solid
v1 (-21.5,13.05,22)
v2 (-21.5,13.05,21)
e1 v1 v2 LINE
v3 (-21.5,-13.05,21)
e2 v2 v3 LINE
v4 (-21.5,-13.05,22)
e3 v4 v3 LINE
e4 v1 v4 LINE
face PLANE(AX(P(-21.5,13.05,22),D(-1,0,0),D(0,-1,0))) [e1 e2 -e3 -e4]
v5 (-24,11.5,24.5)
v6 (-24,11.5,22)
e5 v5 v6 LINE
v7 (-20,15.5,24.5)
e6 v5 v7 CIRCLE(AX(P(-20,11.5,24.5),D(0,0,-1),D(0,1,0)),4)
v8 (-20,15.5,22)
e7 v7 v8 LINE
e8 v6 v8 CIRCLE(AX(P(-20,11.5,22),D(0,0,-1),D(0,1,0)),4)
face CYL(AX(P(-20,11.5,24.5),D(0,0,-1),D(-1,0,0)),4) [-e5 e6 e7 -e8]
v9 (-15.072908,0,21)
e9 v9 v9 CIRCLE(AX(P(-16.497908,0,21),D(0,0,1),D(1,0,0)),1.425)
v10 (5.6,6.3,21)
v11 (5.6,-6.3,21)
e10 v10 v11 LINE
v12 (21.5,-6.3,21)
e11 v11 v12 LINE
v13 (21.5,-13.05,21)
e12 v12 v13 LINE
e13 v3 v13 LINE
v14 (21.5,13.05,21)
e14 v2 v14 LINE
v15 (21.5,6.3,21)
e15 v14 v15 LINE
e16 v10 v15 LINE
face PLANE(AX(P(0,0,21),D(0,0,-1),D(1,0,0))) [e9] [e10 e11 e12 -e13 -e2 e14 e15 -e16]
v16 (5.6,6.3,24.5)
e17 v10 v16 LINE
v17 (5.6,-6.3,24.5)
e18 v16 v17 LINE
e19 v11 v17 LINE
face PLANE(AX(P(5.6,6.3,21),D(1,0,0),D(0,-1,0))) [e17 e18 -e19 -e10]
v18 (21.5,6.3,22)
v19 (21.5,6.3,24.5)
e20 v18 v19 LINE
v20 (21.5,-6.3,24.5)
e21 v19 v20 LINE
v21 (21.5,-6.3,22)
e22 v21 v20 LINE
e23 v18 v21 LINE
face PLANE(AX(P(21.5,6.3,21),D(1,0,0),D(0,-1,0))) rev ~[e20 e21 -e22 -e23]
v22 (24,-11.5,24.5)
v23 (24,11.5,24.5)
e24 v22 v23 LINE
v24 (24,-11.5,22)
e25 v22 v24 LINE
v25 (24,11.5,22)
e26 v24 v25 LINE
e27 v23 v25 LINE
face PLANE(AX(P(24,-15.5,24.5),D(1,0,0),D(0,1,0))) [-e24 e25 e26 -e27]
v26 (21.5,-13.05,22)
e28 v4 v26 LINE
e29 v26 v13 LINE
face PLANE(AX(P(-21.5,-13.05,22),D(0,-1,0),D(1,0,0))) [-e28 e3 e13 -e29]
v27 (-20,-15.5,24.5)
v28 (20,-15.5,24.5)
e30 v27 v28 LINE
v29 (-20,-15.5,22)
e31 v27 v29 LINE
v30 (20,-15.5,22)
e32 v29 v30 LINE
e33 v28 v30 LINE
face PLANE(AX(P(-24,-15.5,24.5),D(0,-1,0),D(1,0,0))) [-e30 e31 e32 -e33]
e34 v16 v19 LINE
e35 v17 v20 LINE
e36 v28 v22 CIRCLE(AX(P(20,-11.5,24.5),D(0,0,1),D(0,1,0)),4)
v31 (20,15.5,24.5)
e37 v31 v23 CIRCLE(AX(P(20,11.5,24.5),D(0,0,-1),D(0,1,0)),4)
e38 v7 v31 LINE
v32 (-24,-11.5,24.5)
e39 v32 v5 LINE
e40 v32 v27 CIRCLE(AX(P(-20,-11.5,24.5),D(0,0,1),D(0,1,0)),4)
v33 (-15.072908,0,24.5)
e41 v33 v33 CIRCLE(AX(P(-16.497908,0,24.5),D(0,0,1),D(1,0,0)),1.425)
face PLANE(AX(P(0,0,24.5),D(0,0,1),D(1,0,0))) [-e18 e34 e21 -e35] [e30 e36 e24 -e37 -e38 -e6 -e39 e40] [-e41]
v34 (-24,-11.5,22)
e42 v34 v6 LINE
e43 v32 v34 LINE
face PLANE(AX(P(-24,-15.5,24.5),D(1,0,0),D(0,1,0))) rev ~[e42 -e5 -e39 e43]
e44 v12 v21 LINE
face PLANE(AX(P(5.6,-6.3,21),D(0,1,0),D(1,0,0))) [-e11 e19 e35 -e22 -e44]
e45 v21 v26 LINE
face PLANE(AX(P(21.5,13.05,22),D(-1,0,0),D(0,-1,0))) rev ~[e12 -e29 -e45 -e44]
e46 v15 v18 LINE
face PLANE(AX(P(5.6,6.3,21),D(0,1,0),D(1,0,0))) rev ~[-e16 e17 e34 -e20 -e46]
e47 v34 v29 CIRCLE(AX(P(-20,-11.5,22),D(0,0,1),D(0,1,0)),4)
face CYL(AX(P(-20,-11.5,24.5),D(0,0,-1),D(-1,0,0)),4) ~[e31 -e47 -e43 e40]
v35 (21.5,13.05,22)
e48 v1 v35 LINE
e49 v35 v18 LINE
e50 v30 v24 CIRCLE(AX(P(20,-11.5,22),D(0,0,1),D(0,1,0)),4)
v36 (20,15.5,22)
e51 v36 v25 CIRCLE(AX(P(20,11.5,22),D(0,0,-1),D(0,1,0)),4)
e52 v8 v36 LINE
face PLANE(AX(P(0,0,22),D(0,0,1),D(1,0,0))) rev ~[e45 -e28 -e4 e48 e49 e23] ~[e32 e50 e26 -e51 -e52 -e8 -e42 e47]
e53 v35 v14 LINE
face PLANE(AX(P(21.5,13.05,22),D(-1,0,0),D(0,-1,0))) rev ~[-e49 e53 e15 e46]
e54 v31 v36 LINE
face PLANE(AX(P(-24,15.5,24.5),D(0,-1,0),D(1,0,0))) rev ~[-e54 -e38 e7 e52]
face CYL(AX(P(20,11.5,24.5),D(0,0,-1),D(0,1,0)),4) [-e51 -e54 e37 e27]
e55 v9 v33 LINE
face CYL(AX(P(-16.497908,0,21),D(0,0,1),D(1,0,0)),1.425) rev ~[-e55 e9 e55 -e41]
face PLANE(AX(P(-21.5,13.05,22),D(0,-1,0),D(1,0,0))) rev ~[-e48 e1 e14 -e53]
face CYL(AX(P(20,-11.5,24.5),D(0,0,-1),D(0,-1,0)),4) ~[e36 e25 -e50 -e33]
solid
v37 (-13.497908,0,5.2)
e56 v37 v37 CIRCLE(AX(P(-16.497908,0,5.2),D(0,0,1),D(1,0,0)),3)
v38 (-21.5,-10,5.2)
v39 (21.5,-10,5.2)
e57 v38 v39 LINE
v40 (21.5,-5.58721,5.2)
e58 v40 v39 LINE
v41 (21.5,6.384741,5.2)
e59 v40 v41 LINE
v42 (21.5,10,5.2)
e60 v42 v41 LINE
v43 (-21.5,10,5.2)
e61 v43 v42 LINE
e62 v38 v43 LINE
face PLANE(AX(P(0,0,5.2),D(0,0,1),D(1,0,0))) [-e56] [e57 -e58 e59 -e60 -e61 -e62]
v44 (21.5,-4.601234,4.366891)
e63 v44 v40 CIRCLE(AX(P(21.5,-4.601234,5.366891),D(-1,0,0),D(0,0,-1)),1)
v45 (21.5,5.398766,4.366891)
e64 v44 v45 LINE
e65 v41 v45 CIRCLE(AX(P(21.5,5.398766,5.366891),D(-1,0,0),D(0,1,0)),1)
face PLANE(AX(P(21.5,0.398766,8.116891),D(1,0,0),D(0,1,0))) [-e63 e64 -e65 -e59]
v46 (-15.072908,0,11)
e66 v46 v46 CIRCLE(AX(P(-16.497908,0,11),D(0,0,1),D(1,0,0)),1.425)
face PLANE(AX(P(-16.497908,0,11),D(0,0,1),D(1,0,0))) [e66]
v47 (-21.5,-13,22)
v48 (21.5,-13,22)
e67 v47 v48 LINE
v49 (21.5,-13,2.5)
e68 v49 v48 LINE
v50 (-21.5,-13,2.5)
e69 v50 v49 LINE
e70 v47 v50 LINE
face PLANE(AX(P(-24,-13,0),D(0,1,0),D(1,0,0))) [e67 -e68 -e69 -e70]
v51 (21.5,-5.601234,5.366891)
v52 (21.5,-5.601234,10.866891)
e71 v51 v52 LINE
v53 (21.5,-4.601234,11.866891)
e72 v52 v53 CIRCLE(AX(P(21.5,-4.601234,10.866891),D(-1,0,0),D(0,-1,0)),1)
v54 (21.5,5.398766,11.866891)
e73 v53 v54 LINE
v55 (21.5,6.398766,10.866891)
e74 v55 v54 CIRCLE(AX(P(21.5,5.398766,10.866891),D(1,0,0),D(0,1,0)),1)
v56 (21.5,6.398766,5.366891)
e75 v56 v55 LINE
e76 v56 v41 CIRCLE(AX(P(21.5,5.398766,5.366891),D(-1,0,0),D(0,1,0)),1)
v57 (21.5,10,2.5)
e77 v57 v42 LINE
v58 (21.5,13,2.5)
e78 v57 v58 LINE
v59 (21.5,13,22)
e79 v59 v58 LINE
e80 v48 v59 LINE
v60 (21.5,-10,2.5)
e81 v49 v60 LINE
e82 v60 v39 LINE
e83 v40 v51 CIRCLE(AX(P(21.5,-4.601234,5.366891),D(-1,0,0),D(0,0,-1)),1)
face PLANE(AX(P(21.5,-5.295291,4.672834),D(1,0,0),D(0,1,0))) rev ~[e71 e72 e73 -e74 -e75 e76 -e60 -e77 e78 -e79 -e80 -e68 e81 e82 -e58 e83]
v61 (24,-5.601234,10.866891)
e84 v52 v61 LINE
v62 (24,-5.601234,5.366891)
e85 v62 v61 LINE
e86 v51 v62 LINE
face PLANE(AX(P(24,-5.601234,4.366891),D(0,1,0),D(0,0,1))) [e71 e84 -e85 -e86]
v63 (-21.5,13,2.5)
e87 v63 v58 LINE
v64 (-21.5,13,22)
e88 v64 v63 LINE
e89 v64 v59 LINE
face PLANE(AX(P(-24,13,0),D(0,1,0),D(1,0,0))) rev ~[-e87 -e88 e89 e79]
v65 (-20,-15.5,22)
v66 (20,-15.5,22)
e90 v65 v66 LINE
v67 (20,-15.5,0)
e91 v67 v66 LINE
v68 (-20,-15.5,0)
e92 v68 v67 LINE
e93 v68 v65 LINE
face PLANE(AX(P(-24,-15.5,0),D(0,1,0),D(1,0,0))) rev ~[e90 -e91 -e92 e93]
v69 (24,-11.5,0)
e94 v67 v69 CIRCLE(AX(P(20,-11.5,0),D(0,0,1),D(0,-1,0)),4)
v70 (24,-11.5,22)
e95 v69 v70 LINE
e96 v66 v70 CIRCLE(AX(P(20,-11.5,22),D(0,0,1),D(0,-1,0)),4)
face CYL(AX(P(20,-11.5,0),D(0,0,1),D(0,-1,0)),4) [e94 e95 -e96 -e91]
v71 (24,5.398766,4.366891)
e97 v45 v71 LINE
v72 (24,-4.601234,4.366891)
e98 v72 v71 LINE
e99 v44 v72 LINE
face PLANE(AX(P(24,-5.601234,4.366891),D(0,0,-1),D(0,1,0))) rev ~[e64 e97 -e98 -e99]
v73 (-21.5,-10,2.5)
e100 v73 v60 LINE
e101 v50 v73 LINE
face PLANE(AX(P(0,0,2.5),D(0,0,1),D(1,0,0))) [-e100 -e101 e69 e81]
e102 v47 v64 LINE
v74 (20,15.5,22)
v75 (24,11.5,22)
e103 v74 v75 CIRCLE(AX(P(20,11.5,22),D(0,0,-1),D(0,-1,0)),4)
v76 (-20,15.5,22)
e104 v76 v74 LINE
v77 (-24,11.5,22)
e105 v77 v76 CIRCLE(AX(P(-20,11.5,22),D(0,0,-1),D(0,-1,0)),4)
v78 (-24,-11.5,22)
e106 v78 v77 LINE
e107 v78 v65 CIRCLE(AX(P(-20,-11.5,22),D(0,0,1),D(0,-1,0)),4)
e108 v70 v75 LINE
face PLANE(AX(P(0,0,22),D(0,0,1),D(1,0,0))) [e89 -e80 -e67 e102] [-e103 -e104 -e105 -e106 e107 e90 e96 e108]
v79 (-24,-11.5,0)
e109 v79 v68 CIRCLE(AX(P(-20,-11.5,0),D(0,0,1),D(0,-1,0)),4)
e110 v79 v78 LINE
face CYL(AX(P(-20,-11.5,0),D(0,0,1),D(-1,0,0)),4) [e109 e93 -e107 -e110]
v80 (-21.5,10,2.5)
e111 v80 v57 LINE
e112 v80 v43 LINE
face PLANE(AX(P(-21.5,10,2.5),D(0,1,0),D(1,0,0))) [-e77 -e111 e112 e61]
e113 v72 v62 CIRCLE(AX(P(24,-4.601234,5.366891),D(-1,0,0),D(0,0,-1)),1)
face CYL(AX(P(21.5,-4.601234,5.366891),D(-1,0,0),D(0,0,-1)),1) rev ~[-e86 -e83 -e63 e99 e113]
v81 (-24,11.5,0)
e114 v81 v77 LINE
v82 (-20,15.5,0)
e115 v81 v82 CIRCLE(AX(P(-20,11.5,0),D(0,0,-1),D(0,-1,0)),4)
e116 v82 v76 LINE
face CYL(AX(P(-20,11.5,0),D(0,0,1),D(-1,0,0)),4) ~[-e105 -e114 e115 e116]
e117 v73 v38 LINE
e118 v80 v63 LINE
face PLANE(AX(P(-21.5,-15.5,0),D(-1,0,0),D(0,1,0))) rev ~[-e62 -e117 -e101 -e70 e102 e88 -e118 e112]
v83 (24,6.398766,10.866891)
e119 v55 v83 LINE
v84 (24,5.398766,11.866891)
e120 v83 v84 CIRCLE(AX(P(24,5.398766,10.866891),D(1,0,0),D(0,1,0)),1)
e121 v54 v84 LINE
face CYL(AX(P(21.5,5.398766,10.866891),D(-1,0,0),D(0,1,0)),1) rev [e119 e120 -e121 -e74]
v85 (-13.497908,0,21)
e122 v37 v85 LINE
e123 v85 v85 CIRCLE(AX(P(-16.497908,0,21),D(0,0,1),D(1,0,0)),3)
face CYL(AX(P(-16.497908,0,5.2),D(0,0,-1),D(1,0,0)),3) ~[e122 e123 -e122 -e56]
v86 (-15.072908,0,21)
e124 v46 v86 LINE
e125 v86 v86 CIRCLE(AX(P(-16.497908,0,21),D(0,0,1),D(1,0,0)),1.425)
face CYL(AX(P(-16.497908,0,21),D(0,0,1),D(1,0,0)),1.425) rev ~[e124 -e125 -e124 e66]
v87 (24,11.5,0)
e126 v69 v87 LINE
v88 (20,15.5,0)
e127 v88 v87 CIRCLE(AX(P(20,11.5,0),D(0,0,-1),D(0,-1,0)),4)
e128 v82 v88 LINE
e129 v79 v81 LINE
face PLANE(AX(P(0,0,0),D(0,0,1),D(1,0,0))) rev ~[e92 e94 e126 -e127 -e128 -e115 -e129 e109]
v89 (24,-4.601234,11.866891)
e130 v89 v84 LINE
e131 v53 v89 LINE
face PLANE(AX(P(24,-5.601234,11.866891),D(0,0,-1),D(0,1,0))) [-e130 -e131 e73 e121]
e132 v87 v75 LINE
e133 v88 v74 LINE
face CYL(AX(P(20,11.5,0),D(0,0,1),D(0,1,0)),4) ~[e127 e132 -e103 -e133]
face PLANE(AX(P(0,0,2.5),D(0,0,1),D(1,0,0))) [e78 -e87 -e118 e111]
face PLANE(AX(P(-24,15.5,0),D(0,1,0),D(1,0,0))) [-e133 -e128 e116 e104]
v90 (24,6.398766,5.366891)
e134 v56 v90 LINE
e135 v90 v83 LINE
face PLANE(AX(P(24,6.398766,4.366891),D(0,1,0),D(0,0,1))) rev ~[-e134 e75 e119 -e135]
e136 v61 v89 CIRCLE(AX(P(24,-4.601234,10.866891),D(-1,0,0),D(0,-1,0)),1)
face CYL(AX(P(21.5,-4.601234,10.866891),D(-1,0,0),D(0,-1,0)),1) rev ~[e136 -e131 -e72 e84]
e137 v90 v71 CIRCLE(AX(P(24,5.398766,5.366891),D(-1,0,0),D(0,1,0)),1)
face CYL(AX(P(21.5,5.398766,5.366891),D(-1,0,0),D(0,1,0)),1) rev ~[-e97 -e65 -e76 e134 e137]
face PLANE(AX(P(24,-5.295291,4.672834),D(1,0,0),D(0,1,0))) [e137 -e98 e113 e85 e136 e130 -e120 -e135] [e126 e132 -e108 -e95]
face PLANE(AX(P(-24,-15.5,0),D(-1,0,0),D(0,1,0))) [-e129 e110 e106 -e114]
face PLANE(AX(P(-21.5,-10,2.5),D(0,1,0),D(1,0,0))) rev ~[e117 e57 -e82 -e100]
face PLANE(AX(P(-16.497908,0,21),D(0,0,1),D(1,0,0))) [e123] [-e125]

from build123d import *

# Parameters (mm, degrees)
F0_W           = 48
F0_H           = 31
F1_DEPTH       = 22
F2_T           = -2.5
F3_W           = 43
F3_H           = 20
F4_DEPTH       = 2.7
F6_W           = 48
F6_H           = 31
F7_DEPTH       = 2.5
F8_W           = 43
F8_H           = 26.1
F9_DEPTH       = 1
F10_W          = 15.9
F10_H          = 12.6
F11_DEPTH      = 3.5
F12_R          = 4
F12_2_R        = 4
F13_W          = 12
F13_H          = 7.5
F14_DEPTH      = 2.5
F15_T1_DEPTH   = 2.5
F16_R          = 3
F17_DEPTH      = 15.8
F18_R          = 1.425
F19_DEPTH      = 3.5
F19_DEPTH_BACK = 10


# Not quite as in the source:
# - a fillet or chamfer that OpenCascade refuses, or shapes differently, is made with other operations: its cross-section is extruded or revolved along the edge and cut away or added


with BuildPart() as f1:
    # F0 (on Top) → F1 (new body)
    with BuildSketch(Plane.XY):
        Rectangle(F0_W, F0_H)
    extrude(amount=F1_DEPTH)

    # F2
    f2_openings = [f1.faces().sort_by_distance(p)[0] for p in [
        (0, 0, 22),
    ]]
    offset(amount=F2_T, openings=f2_openings)

    # F3 (on face) → F4 (join)
    with BuildSketch(Plane.XY.offset(2.5)):
        Rectangle(F3_W, F3_H)
    extrude(amount=F4_DEPTH)

    # F12
    f12_edges = [f1.edges().sort_by_distance(p)[0] for p in [
        (24, -15.5, 11),
        (-24, -15.5, 11),
        (-24, 15.5, 11),
        (24, 15.5, 11),
    ]]
    fillet(f12_edges, radius=F12_R)

    # F13 (on face) → F14 (cut, through all)
    with BuildSketch(Plane.YZ.offset(24)):
        with Locations((0.3987657316, 8.116890993)):
            Rectangle(F13_W, F13_H)
    extrude(amount=-F14_DEPTH, mode=Mode.SUBTRACT)

    # F15: fillet of radius 1 on 4 edges, made by hand

    # F15_s2 → F15_t1 (join)
    with BuildSketch(Plane.YZ.offset(21.5)):
        with BuildLine():
            ThreePointArc((-4.6012342684, 4.366890993), (-5.3083410496, 4.6597842118), (-5.6012342684, 5.366890993))
            Line((-5.6012342684, 5.366890993), (-5.6012342684, 4.366890993))
            Line((-5.6012342684, 4.366890993), (-4.6012342684, 4.366890993))
        make_face()
        with BuildLine():
            ThreePointArc((6.3987657316, 5.366890993), (6.1058725128, 4.6597842118), (5.3987657316, 4.366890993))
            Line((5.3987657316, 4.366890993), (6.3987657316, 4.366890993))
            Line((6.3987657316, 4.366890993), (6.3987657316, 5.366890993))
        make_face()
        with BuildLine():
            ThreePointArc((6.3987657316, 10.866890993), (6.1058725128, 11.5739977742), (5.3987657316, 11.866890993))
            Line((5.3987657316, 11.866890993), (6.3987657316, 11.866890993))
            Line((6.3987657316, 11.866890993), (6.3987657316, 10.866890993))
        make_face()
        with BuildLine():
            ThreePointArc((-5.6012342684, 10.866890993), (-5.3083410496, 11.5739977742), (-4.6012342684, 11.866890993))
            Line((-4.6012342684, 11.866890993), (-5.6012342684, 11.866890993))
            Line((-5.6012342684, 11.866890993), (-5.6012342684, 10.866890993))
        make_face()
    extrude(amount=F15_T1_DEPTH)

    # F16 (on face) → F17 (join, through all)
    with BuildSketch(Plane.XY.offset(5.2)):
        with Locations((-16.4979076515, 0)):
            Circle(F16_R)
    extrude(amount=F17_DEPTH)


with BuildPart() as f7:
    # F6 (on offset) → F7 (new body)
    with BuildSketch(Plane.XY.offset(24.5)):
        Rectangle(F6_W, F6_H)
    extrude(amount=-F7_DEPTH)

    # F8 (on face) → F9 (join)
    with BuildSketch(Plane(origin=(0, 0, 22), x_dir=(1, 0, 0), z_dir=(0, 0, -1))):
        Rectangle(F8_W, F8_H)
    extrude(amount=F9_DEPTH)

    # F10 (on face) → F11 (cut, through all)
    with BuildSketch(Plane(origin=(0, 0, 21), x_dir=(1, 0, 0), z_dir=(0, 0, -1))):
        with Locations((13.55, 0)):
            Rectangle(F10_W, F10_H)
    extrude(amount=-F11_DEPTH, mode=Mode.SUBTRACT)

    # F12#2
    f12_2_edges = [f7.edges().sort_by_distance(p)[0] for p in [
        (24, -15.5, 23.25),
        (24, 15.5, 23.25),
        (-24, -15.5, 23.25),
        (-24, 15.5, 23.25),
    ]]
    fillet(f12_2_edges, radius=F12_2_R)


with BuildPart() as f19_tool:
    # F18 (on face) → F19 (new body, two sides)
    with BuildSketch(Plane.XY.offset(21)) as f19_sk:
        with Locations((-16.4979076515, 0)):
            Circle(F18_R)
    extrude(amount=F19_DEPTH)
    extrude(f19_sk.sketch, amount=-F19_DEPTH_BACK)


with BuildPart() as f1_1:
    add(f1.part)

    # F19: cut by f19_tool
    add(f19_tool.part, mode=Mode.SUBTRACT)


with BuildPart() as f7_1:
    add(f7.part)

    # F19: cut by f19_tool
    add(f19_tool.part, mode=Mode.SUBTRACT)


solid = Compound([f1_1.part, f7_1.part])
